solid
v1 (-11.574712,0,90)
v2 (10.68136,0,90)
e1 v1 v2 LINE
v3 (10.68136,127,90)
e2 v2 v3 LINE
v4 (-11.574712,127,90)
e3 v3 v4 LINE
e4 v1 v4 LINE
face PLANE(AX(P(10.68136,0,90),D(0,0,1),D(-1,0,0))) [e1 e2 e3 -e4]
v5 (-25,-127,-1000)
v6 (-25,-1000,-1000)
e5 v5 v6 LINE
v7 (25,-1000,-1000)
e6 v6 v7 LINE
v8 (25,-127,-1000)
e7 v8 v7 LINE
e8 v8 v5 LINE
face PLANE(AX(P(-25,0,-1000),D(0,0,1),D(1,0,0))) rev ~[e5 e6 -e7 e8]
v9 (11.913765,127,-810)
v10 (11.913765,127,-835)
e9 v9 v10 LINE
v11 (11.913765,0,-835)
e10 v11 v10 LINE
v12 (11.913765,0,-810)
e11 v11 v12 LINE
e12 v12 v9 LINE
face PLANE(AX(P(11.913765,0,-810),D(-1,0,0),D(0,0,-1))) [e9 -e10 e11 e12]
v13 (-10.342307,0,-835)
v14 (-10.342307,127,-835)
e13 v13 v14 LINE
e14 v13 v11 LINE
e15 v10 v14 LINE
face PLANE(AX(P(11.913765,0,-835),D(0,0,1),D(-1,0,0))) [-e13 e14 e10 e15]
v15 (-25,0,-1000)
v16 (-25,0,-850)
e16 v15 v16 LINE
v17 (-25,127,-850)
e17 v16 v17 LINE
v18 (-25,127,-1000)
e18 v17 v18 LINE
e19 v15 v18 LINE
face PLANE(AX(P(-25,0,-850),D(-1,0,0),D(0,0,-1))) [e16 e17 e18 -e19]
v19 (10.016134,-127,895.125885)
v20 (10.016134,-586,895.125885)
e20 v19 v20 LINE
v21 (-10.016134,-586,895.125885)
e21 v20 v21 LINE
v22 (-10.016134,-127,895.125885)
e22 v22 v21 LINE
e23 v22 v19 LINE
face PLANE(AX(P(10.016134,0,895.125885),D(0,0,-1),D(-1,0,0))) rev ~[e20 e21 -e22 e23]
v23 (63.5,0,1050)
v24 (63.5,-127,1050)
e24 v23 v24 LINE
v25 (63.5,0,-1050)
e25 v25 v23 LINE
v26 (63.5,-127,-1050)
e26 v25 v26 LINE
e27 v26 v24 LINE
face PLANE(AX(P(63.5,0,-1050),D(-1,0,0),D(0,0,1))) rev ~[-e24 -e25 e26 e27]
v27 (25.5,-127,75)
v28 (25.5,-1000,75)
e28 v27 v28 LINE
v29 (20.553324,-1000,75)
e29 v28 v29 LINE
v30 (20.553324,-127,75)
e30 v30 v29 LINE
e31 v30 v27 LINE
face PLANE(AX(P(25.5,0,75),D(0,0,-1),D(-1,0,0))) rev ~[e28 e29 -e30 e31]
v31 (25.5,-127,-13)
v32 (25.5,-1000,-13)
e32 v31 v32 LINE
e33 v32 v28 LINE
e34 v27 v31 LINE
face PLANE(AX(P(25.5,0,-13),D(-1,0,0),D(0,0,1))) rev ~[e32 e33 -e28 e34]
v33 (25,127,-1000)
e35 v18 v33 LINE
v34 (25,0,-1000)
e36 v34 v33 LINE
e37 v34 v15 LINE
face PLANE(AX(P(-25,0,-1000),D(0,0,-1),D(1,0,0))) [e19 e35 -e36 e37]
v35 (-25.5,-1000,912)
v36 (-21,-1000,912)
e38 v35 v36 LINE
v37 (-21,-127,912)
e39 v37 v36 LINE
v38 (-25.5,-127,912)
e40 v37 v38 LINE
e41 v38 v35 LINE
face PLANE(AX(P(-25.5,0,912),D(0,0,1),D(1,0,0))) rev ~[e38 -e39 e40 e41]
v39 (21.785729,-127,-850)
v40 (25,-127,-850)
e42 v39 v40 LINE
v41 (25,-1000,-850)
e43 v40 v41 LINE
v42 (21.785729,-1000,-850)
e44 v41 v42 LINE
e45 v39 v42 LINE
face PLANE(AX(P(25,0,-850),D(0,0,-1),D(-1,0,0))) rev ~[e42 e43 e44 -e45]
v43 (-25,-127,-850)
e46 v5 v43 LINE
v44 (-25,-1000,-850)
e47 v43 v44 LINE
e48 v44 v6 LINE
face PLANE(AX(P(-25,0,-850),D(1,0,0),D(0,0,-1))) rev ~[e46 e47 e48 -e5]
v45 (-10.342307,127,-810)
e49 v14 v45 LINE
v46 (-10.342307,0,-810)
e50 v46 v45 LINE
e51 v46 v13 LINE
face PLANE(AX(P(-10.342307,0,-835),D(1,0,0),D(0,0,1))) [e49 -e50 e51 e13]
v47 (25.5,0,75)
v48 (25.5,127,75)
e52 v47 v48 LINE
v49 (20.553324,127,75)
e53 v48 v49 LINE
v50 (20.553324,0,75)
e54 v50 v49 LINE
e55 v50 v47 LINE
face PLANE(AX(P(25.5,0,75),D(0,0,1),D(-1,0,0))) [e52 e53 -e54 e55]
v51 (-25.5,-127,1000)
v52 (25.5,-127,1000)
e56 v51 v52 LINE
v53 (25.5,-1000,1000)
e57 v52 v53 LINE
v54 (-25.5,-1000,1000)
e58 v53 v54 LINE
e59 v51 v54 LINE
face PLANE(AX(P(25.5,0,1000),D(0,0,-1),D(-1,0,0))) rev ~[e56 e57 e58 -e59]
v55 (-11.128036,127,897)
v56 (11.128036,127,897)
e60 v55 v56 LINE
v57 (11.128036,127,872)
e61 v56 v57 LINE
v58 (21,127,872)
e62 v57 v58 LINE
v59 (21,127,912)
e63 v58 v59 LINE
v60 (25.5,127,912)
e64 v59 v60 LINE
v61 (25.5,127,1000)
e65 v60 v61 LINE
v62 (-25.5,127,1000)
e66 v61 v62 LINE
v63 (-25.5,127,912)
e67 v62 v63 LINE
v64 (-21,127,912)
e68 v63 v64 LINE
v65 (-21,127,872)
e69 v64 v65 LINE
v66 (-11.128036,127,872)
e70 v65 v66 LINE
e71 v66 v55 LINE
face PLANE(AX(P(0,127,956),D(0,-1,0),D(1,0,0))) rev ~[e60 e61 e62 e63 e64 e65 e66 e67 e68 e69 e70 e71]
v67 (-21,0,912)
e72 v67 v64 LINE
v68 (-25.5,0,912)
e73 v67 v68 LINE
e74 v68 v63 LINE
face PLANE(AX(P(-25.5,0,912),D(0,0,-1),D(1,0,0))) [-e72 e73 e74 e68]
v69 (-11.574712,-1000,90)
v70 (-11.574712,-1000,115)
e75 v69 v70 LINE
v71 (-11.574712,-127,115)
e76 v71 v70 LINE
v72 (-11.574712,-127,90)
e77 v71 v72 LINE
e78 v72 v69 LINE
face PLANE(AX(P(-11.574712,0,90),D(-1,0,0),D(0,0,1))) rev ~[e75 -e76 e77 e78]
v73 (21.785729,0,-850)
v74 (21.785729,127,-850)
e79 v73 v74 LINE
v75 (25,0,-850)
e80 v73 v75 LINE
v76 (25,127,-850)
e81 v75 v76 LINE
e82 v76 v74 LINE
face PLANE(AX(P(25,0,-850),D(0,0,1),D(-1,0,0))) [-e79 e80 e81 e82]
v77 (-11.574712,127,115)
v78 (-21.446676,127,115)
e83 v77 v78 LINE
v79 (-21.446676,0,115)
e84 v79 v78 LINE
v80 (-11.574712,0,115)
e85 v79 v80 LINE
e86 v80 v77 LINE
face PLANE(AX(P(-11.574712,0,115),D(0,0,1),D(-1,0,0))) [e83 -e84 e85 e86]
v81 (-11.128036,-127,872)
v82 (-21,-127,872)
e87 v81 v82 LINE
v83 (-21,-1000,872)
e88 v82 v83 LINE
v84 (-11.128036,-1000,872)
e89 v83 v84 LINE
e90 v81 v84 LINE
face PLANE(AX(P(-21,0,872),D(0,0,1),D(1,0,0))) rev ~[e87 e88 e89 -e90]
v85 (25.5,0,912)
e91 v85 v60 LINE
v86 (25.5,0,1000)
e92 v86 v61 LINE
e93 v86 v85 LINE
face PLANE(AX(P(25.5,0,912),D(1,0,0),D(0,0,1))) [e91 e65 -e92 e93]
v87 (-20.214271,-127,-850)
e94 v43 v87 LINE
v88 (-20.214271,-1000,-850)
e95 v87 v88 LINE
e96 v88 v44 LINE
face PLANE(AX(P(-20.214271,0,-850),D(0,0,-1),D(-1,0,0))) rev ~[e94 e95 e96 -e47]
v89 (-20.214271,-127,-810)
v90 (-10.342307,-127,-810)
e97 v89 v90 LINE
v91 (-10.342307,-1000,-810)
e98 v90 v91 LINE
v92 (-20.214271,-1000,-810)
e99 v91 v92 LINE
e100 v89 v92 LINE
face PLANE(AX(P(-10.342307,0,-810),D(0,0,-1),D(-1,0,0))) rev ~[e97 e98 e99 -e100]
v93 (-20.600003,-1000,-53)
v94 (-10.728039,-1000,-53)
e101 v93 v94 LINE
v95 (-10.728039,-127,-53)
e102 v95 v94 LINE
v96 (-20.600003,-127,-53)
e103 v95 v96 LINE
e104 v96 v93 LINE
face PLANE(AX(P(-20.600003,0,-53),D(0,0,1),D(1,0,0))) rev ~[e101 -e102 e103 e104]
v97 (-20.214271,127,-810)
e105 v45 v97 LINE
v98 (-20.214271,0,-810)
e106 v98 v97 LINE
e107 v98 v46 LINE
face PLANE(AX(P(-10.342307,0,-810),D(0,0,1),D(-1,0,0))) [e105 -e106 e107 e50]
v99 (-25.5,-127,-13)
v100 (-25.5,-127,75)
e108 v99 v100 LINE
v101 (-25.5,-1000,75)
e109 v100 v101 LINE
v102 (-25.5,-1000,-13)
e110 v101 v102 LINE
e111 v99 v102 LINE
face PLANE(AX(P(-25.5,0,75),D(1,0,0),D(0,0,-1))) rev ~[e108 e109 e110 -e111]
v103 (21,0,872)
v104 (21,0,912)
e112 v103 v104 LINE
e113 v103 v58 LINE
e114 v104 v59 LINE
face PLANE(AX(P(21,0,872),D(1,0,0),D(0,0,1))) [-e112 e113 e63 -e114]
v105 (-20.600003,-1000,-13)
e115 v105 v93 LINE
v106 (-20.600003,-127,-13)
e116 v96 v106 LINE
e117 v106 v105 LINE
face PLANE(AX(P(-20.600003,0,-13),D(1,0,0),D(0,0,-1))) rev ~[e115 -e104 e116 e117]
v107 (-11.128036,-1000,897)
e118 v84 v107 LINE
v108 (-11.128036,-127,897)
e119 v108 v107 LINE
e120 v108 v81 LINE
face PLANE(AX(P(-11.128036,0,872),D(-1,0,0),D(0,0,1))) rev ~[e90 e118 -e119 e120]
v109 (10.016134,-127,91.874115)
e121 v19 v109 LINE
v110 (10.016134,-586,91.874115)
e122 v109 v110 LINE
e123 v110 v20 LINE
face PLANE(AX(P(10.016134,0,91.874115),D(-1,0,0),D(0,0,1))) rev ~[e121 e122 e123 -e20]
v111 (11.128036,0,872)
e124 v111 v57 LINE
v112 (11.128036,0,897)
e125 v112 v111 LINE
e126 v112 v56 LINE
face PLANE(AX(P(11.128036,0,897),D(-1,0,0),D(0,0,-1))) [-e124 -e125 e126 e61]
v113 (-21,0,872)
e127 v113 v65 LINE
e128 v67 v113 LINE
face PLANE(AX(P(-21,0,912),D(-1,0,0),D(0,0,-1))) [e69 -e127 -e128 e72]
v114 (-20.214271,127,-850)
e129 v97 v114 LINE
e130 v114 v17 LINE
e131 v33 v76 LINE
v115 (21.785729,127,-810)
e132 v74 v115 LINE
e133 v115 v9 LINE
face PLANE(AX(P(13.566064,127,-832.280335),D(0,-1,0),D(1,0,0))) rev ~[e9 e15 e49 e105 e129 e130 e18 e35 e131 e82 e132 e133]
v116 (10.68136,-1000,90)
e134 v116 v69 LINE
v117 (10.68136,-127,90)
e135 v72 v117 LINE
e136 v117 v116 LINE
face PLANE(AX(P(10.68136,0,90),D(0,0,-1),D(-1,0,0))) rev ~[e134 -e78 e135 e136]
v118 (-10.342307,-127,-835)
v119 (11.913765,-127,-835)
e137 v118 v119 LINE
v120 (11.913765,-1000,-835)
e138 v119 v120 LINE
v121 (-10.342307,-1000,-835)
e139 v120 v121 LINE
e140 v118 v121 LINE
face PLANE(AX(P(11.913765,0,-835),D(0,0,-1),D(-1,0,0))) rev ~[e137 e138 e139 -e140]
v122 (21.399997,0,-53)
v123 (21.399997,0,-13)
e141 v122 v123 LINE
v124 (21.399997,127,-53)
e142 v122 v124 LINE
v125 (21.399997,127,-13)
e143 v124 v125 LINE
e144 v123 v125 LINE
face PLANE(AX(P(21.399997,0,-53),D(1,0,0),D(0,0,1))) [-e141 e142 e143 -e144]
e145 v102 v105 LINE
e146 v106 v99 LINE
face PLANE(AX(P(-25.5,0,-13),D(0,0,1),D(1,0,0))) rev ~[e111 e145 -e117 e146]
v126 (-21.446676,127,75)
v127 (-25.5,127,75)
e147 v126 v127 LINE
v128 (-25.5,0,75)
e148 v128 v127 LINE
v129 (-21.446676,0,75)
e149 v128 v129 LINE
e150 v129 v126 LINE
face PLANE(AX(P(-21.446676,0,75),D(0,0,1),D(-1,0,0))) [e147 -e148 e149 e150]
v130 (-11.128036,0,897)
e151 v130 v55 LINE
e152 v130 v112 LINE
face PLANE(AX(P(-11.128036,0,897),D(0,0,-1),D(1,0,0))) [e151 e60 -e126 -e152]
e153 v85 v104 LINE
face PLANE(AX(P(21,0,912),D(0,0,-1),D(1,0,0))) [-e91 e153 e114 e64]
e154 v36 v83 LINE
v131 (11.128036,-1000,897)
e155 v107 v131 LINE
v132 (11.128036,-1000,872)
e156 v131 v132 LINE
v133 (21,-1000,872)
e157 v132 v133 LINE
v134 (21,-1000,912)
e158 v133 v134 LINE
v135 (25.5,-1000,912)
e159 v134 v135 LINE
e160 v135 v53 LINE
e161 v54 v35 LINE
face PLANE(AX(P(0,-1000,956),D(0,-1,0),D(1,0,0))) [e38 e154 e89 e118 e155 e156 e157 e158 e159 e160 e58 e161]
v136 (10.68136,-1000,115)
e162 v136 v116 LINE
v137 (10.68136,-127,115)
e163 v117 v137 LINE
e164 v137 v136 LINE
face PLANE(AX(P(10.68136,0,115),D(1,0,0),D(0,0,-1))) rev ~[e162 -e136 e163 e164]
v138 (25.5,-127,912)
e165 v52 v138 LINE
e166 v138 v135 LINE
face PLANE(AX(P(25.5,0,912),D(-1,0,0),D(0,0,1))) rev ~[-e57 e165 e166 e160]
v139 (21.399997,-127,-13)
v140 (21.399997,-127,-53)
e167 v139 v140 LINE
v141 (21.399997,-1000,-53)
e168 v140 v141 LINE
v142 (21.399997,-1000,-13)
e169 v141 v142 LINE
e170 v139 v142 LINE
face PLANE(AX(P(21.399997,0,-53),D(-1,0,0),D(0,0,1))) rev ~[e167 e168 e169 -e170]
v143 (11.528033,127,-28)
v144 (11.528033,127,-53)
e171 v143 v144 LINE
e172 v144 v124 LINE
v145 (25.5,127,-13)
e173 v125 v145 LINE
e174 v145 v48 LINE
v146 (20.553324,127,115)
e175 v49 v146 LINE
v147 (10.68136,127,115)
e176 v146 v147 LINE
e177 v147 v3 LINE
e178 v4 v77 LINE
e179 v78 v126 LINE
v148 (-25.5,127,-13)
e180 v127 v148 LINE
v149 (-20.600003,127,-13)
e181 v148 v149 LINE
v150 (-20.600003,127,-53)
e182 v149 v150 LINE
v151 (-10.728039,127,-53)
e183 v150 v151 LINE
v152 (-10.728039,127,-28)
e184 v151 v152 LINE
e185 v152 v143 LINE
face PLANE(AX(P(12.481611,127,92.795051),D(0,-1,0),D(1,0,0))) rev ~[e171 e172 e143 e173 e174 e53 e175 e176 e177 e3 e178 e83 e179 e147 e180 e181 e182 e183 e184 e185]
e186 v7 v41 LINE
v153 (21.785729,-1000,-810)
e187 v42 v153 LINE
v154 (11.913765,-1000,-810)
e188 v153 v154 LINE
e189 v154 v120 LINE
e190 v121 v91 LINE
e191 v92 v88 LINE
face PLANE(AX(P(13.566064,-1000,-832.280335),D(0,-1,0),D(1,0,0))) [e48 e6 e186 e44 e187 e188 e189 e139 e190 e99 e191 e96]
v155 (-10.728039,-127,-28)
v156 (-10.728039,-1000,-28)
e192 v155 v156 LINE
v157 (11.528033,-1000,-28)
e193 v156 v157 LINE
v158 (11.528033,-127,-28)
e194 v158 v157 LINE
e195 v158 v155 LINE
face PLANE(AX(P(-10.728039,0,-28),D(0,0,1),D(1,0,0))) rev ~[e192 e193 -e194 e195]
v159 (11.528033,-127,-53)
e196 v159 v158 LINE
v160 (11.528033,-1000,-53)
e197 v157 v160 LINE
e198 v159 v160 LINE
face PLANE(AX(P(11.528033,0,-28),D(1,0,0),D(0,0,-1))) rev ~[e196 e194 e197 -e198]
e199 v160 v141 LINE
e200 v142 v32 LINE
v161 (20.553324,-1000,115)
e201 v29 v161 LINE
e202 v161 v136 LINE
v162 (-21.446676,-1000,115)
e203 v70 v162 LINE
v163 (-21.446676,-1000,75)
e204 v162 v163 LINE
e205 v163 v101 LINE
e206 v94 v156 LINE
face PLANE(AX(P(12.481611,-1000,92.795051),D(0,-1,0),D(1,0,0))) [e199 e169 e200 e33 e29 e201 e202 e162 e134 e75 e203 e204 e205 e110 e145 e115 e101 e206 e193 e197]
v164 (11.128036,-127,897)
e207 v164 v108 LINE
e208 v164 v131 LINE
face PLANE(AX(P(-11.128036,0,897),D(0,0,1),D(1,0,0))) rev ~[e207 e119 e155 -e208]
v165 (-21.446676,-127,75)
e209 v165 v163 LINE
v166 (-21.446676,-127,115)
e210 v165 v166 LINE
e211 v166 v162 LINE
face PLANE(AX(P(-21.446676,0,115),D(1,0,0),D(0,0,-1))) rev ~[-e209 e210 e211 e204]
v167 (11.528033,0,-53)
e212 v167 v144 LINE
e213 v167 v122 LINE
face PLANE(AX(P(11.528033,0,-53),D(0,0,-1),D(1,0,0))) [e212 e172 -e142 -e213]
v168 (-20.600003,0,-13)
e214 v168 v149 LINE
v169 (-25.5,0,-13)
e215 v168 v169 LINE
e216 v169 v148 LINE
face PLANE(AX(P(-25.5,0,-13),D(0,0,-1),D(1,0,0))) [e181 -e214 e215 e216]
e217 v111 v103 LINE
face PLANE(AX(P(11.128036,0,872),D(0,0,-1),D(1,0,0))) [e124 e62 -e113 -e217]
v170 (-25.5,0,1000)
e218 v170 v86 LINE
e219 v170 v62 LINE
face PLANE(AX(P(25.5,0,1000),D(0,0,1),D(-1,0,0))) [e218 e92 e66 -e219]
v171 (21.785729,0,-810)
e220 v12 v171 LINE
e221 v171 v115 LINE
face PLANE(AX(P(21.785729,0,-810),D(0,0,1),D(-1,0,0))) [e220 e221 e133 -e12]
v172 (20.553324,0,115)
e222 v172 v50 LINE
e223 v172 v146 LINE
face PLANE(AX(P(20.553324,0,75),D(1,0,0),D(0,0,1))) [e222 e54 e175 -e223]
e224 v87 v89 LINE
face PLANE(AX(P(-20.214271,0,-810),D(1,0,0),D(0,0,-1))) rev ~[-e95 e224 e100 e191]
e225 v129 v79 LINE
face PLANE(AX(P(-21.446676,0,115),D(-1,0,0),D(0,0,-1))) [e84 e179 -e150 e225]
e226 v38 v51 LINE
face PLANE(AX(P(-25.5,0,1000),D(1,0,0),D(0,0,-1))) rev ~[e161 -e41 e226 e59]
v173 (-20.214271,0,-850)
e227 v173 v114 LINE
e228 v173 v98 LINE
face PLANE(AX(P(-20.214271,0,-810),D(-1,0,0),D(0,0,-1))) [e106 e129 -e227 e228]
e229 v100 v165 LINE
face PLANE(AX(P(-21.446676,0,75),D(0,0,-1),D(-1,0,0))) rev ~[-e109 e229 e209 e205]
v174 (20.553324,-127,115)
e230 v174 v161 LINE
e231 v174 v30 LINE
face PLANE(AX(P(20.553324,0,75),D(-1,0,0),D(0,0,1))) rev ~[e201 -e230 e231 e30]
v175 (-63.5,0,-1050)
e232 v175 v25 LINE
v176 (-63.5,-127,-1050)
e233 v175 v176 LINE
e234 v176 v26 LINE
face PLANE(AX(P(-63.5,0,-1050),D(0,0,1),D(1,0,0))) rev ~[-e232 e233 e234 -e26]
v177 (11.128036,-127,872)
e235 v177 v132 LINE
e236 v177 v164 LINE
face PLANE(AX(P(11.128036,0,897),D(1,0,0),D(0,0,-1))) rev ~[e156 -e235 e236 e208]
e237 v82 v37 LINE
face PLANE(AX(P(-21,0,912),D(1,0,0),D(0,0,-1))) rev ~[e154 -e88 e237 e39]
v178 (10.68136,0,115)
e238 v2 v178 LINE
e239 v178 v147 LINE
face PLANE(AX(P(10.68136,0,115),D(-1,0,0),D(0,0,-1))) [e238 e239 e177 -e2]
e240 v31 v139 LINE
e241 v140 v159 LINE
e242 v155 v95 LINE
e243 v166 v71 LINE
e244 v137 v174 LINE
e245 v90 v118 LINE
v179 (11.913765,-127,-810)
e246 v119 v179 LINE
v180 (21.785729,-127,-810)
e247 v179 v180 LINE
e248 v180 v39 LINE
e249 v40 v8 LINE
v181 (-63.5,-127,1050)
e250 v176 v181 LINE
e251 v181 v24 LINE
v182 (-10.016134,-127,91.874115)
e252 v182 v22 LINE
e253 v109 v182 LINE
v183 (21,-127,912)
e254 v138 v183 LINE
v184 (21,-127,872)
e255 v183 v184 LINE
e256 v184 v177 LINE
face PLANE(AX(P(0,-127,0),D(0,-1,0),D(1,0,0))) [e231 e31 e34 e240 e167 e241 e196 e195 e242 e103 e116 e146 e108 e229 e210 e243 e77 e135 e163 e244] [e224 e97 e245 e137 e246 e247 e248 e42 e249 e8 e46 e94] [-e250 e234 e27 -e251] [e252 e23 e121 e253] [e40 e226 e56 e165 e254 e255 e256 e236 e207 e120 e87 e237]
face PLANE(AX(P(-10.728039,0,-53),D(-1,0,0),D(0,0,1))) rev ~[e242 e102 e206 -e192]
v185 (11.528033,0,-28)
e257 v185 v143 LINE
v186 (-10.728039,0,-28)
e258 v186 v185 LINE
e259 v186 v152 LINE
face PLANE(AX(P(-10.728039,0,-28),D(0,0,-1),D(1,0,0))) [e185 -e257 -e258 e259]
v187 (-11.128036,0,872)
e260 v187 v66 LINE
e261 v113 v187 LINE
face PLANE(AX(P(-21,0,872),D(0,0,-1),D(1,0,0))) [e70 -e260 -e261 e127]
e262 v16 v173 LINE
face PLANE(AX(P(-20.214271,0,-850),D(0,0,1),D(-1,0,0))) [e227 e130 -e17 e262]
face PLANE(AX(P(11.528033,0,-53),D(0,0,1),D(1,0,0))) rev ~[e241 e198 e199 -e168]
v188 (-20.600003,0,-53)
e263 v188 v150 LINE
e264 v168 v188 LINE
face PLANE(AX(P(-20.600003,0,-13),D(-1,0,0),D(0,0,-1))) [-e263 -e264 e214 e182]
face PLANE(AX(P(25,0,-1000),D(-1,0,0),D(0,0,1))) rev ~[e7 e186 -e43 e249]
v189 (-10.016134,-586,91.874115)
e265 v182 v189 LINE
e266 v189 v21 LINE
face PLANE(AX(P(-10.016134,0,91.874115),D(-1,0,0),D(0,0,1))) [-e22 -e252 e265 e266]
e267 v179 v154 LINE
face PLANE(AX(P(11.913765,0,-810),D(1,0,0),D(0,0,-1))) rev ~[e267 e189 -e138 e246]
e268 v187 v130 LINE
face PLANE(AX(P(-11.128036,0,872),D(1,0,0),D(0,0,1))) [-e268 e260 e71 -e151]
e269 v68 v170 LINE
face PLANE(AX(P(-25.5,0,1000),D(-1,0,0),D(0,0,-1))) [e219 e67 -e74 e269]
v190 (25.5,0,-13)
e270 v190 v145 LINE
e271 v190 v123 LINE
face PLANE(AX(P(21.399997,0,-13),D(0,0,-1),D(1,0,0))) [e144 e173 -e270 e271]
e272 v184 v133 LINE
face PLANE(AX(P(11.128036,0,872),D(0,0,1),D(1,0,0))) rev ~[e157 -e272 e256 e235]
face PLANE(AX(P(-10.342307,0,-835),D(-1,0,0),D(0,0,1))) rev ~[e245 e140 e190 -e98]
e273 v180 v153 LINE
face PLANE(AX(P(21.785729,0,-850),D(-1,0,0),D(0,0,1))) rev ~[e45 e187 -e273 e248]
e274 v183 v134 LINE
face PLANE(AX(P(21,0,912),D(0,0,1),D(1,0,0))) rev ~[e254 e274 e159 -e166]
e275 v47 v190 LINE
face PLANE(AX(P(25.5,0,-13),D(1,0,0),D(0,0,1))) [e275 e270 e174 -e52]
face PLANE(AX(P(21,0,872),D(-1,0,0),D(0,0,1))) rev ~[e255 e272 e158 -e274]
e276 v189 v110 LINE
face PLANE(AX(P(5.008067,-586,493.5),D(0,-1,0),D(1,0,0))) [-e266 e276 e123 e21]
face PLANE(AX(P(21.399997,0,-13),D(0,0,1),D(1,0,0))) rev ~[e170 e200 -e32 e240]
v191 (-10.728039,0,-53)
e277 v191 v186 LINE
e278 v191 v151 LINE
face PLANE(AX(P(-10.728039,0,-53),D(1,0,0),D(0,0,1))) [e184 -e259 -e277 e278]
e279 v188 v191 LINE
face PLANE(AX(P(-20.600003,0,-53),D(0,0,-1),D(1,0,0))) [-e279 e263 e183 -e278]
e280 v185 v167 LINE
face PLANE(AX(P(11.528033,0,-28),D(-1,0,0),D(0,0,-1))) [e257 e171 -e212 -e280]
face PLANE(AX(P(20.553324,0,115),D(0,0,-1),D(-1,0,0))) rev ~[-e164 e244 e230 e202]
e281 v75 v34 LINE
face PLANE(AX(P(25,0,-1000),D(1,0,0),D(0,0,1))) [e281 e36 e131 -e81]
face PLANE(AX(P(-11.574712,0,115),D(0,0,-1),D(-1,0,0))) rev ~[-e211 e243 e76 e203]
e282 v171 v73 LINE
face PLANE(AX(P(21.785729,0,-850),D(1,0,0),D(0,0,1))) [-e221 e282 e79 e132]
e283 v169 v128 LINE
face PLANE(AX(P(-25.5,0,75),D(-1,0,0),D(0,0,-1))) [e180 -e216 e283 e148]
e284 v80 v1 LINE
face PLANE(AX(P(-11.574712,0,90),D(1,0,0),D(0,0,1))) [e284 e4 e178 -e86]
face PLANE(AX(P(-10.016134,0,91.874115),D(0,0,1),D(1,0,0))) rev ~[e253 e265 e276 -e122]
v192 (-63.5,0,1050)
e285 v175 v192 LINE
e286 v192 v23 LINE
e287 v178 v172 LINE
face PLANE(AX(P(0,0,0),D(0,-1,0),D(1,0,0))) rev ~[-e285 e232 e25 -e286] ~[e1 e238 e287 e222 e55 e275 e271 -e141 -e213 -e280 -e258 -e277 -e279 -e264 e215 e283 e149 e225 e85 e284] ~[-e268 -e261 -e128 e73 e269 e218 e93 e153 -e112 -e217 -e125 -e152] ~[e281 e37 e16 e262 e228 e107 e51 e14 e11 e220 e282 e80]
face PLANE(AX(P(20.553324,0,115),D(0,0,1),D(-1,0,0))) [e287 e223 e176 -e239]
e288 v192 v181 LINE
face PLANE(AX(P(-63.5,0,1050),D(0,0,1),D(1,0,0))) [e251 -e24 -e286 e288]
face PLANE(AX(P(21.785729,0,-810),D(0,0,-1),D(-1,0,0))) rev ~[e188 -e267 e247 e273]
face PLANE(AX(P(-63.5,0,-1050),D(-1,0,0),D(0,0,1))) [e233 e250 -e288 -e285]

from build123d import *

# Parameters (mm, degrees)
F0_W          = 127
F0_H          = 2100
F1_DEPTH      = 127
F2_DEPTH      = 127
F2_DEPTH_BACK = 1000
F0_W_2        = 10.0161342862
F0_H_2        = 803.2517696619
F3_DEPTH      = 586


with BuildPart() as f1:
    # F0 (on Front) → F1 (new body)
    with BuildSketch(Plane.XZ):
        Rectangle(F0_W, F0_H)
        Polygon((-10.3423068728, -835), (0.7857291494, -835), (11.9137651715, -835), (11.9137651715, -810), (21.7857291494, -810), (21.7857291494, -850), (25, -850), (25, -1000), (-25, -1000), (-25, -850), (-20.2142708506, -850), (-20.2142708506, -810), (-10.3423068728, -810), align=None, mode=Mode.SUBTRACT)
        Polygon((-10.0161342919, 895.125884831), (-2.774e-07, 895.125884831), (10.0161340088, 895.125884831), (10.0161340088, 91.874115169), (-5.7e-09, 91.874115169), (-10.0161342919, 91.874115169), align=None, mode=Mode.SUBTRACT)
        Polygon((-11.5747122988, 90), (-5.1e-09, 90), (10.6813597456, 90), (10.6813597456, 115), (20.5533237234, 115), (20.5533237234, 75), (25.5, 75), (25.5, -13), (21.3999971747, -13), (21.3999971747, -53), (11.5280331969, -53), (11.5280331969, -28), (0.7857291494, -28), (-10.7280388474, -28), (-10.7280388474, -53), (-20.6000028253, -53), (-20.6000028253, -13), (-25.5, -13), (-25.5, 75), (-21.4466762766, 75), (-21.4466762766, 115), (-11.5747122988, 115), align=None, mode=Mode.SUBTRACT)
        Polygon((25.5, 1000), (25.5, 912), (20.9999997169, 912), (20.9999997169, 872), (11.1280357391, 872), (11.1280357391, 897), (-2.78e-07, 897), (-11.1280363053, 897), (-11.1280363053, 872), (-21.0000002831, 872), (-21.0000002831, 912), (-25.5, 912), (-25.5, 1000), align=None, mode=Mode.SUBTRACT)
        Polygon((20.9999997169, 872), (20.9999997169, 912), (-2.831e-07, 912), (-2.78e-07, 897), (11.1280357391, 897), (11.1280357391, 872), align=None)
        Polygon((-2.78e-07, 897), (-2.831e-07, 912), (-21.0000002831, 912), (-21.0000002831, 872), (-11.1280363053, 872), (-11.1280363053, 897), align=None)
        Polygon((21.3999971747, -53), (21.3999971747, -13), (0.7857291494, -13), (0.7857291494, -28), (11.5280331969, -28), (11.5280331969, -53), align=None)
        Polygon((0.7857291494, -13), (-20.6000028253, -13), (-20.6000028253, -53), (-10.7280388474, -53), (-10.7280388474, -28), (0.7857291494, -28), align=None)
    extrude(amount=F1_DEPTH)

    # F0 (on Front) → F2 (join, two sides)
    with BuildSketch(Plane.XZ) as f2_sk:
        Polygon((11.9137651715, -835), (0.7857291494, -835), (0.7857291494, -850), (21.7857291494, -850), (21.7857291494, -810), (11.9137651715, -810), align=None)
        Polygon((0.7857291494, -850), (0.7857291494, -835), (-10.3423068728, -835), (-10.3423068728, -810), (-20.2142708506, -810), (-20.2142708506, -850), align=None)
        Polygon((10.6813597456, 90), (-5.1e-09, 90), (0, 75), (20.5533237234, 75), (20.5533237234, 115), (10.6813597456, 115), align=None)
        Polygon((0, 75), (-5.1e-09, 90), (-11.5747122988, 90), (-11.5747122988, 115), (-21.4466762766, 115), (-21.4466762766, 75), align=None)
        Polygon((20.9999997169, 912), (25.5, 912), (25.5, 1000), (-25.5, 1000), (-25.5, 912), (-21.0000002831, 912), (-2.831e-07, 912), align=None)
        Polygon((20.9999997169, 872), (20.9999997169, 912), (-2.831e-07, 912), (-2.78e-07, 897), (11.1280357391, 897), (11.1280357391, 872), align=None)
        Polygon((-2.78e-07, 897), (-2.831e-07, 912), (-21.0000002831, 912), (-21.0000002831, 872), (-11.1280363053, 872), (-11.1280363053, 897), align=None)
        Polygon((20.5533237234, 75), (0, 75), (-21.4466762766, 75), (-25.5, 75), (-25.5, -13), (-20.6000028253, -13), (0.7857291494, -13), (21.3999971747, -13), (25.5, -13), (25.5, 75), align=None)
        Polygon((21.3999971747, -53), (21.3999971747, -13), (0.7857291494, -13), (0.7857291494, -28), (11.5280331969, -28), (11.5280331969, -53), align=None)
        Polygon((0.7857291494, -13), (-20.6000028253, -13), (-20.6000028253, -53), (-10.7280388474, -53), (-10.7280388474, -28), (0.7857291494, -28), align=None)
        Polygon((21.7857291494, -850), (0.7857291494, -850), (-20.2142708506, -850), (-25, -850), (-25, -1000), (25, -1000), (25, -850), align=None)
    extrude(amount=-F2_DEPTH)
    extrude(f2_sk.sketch, amount=F2_DEPTH_BACK)

    # F0 (on Front) → F3 (join)
    with BuildSketch(Plane.XZ):
        with Locations((5.0080668657, 493.5)):
            Rectangle(F0_W_2, F0_H_2)
        with Locations((-5.0080671488, 493.5)):
            Rectangle(F0_W_2, F0_H_2)
    extrude(amount=F3_DEPTH)


solid = f1.part
